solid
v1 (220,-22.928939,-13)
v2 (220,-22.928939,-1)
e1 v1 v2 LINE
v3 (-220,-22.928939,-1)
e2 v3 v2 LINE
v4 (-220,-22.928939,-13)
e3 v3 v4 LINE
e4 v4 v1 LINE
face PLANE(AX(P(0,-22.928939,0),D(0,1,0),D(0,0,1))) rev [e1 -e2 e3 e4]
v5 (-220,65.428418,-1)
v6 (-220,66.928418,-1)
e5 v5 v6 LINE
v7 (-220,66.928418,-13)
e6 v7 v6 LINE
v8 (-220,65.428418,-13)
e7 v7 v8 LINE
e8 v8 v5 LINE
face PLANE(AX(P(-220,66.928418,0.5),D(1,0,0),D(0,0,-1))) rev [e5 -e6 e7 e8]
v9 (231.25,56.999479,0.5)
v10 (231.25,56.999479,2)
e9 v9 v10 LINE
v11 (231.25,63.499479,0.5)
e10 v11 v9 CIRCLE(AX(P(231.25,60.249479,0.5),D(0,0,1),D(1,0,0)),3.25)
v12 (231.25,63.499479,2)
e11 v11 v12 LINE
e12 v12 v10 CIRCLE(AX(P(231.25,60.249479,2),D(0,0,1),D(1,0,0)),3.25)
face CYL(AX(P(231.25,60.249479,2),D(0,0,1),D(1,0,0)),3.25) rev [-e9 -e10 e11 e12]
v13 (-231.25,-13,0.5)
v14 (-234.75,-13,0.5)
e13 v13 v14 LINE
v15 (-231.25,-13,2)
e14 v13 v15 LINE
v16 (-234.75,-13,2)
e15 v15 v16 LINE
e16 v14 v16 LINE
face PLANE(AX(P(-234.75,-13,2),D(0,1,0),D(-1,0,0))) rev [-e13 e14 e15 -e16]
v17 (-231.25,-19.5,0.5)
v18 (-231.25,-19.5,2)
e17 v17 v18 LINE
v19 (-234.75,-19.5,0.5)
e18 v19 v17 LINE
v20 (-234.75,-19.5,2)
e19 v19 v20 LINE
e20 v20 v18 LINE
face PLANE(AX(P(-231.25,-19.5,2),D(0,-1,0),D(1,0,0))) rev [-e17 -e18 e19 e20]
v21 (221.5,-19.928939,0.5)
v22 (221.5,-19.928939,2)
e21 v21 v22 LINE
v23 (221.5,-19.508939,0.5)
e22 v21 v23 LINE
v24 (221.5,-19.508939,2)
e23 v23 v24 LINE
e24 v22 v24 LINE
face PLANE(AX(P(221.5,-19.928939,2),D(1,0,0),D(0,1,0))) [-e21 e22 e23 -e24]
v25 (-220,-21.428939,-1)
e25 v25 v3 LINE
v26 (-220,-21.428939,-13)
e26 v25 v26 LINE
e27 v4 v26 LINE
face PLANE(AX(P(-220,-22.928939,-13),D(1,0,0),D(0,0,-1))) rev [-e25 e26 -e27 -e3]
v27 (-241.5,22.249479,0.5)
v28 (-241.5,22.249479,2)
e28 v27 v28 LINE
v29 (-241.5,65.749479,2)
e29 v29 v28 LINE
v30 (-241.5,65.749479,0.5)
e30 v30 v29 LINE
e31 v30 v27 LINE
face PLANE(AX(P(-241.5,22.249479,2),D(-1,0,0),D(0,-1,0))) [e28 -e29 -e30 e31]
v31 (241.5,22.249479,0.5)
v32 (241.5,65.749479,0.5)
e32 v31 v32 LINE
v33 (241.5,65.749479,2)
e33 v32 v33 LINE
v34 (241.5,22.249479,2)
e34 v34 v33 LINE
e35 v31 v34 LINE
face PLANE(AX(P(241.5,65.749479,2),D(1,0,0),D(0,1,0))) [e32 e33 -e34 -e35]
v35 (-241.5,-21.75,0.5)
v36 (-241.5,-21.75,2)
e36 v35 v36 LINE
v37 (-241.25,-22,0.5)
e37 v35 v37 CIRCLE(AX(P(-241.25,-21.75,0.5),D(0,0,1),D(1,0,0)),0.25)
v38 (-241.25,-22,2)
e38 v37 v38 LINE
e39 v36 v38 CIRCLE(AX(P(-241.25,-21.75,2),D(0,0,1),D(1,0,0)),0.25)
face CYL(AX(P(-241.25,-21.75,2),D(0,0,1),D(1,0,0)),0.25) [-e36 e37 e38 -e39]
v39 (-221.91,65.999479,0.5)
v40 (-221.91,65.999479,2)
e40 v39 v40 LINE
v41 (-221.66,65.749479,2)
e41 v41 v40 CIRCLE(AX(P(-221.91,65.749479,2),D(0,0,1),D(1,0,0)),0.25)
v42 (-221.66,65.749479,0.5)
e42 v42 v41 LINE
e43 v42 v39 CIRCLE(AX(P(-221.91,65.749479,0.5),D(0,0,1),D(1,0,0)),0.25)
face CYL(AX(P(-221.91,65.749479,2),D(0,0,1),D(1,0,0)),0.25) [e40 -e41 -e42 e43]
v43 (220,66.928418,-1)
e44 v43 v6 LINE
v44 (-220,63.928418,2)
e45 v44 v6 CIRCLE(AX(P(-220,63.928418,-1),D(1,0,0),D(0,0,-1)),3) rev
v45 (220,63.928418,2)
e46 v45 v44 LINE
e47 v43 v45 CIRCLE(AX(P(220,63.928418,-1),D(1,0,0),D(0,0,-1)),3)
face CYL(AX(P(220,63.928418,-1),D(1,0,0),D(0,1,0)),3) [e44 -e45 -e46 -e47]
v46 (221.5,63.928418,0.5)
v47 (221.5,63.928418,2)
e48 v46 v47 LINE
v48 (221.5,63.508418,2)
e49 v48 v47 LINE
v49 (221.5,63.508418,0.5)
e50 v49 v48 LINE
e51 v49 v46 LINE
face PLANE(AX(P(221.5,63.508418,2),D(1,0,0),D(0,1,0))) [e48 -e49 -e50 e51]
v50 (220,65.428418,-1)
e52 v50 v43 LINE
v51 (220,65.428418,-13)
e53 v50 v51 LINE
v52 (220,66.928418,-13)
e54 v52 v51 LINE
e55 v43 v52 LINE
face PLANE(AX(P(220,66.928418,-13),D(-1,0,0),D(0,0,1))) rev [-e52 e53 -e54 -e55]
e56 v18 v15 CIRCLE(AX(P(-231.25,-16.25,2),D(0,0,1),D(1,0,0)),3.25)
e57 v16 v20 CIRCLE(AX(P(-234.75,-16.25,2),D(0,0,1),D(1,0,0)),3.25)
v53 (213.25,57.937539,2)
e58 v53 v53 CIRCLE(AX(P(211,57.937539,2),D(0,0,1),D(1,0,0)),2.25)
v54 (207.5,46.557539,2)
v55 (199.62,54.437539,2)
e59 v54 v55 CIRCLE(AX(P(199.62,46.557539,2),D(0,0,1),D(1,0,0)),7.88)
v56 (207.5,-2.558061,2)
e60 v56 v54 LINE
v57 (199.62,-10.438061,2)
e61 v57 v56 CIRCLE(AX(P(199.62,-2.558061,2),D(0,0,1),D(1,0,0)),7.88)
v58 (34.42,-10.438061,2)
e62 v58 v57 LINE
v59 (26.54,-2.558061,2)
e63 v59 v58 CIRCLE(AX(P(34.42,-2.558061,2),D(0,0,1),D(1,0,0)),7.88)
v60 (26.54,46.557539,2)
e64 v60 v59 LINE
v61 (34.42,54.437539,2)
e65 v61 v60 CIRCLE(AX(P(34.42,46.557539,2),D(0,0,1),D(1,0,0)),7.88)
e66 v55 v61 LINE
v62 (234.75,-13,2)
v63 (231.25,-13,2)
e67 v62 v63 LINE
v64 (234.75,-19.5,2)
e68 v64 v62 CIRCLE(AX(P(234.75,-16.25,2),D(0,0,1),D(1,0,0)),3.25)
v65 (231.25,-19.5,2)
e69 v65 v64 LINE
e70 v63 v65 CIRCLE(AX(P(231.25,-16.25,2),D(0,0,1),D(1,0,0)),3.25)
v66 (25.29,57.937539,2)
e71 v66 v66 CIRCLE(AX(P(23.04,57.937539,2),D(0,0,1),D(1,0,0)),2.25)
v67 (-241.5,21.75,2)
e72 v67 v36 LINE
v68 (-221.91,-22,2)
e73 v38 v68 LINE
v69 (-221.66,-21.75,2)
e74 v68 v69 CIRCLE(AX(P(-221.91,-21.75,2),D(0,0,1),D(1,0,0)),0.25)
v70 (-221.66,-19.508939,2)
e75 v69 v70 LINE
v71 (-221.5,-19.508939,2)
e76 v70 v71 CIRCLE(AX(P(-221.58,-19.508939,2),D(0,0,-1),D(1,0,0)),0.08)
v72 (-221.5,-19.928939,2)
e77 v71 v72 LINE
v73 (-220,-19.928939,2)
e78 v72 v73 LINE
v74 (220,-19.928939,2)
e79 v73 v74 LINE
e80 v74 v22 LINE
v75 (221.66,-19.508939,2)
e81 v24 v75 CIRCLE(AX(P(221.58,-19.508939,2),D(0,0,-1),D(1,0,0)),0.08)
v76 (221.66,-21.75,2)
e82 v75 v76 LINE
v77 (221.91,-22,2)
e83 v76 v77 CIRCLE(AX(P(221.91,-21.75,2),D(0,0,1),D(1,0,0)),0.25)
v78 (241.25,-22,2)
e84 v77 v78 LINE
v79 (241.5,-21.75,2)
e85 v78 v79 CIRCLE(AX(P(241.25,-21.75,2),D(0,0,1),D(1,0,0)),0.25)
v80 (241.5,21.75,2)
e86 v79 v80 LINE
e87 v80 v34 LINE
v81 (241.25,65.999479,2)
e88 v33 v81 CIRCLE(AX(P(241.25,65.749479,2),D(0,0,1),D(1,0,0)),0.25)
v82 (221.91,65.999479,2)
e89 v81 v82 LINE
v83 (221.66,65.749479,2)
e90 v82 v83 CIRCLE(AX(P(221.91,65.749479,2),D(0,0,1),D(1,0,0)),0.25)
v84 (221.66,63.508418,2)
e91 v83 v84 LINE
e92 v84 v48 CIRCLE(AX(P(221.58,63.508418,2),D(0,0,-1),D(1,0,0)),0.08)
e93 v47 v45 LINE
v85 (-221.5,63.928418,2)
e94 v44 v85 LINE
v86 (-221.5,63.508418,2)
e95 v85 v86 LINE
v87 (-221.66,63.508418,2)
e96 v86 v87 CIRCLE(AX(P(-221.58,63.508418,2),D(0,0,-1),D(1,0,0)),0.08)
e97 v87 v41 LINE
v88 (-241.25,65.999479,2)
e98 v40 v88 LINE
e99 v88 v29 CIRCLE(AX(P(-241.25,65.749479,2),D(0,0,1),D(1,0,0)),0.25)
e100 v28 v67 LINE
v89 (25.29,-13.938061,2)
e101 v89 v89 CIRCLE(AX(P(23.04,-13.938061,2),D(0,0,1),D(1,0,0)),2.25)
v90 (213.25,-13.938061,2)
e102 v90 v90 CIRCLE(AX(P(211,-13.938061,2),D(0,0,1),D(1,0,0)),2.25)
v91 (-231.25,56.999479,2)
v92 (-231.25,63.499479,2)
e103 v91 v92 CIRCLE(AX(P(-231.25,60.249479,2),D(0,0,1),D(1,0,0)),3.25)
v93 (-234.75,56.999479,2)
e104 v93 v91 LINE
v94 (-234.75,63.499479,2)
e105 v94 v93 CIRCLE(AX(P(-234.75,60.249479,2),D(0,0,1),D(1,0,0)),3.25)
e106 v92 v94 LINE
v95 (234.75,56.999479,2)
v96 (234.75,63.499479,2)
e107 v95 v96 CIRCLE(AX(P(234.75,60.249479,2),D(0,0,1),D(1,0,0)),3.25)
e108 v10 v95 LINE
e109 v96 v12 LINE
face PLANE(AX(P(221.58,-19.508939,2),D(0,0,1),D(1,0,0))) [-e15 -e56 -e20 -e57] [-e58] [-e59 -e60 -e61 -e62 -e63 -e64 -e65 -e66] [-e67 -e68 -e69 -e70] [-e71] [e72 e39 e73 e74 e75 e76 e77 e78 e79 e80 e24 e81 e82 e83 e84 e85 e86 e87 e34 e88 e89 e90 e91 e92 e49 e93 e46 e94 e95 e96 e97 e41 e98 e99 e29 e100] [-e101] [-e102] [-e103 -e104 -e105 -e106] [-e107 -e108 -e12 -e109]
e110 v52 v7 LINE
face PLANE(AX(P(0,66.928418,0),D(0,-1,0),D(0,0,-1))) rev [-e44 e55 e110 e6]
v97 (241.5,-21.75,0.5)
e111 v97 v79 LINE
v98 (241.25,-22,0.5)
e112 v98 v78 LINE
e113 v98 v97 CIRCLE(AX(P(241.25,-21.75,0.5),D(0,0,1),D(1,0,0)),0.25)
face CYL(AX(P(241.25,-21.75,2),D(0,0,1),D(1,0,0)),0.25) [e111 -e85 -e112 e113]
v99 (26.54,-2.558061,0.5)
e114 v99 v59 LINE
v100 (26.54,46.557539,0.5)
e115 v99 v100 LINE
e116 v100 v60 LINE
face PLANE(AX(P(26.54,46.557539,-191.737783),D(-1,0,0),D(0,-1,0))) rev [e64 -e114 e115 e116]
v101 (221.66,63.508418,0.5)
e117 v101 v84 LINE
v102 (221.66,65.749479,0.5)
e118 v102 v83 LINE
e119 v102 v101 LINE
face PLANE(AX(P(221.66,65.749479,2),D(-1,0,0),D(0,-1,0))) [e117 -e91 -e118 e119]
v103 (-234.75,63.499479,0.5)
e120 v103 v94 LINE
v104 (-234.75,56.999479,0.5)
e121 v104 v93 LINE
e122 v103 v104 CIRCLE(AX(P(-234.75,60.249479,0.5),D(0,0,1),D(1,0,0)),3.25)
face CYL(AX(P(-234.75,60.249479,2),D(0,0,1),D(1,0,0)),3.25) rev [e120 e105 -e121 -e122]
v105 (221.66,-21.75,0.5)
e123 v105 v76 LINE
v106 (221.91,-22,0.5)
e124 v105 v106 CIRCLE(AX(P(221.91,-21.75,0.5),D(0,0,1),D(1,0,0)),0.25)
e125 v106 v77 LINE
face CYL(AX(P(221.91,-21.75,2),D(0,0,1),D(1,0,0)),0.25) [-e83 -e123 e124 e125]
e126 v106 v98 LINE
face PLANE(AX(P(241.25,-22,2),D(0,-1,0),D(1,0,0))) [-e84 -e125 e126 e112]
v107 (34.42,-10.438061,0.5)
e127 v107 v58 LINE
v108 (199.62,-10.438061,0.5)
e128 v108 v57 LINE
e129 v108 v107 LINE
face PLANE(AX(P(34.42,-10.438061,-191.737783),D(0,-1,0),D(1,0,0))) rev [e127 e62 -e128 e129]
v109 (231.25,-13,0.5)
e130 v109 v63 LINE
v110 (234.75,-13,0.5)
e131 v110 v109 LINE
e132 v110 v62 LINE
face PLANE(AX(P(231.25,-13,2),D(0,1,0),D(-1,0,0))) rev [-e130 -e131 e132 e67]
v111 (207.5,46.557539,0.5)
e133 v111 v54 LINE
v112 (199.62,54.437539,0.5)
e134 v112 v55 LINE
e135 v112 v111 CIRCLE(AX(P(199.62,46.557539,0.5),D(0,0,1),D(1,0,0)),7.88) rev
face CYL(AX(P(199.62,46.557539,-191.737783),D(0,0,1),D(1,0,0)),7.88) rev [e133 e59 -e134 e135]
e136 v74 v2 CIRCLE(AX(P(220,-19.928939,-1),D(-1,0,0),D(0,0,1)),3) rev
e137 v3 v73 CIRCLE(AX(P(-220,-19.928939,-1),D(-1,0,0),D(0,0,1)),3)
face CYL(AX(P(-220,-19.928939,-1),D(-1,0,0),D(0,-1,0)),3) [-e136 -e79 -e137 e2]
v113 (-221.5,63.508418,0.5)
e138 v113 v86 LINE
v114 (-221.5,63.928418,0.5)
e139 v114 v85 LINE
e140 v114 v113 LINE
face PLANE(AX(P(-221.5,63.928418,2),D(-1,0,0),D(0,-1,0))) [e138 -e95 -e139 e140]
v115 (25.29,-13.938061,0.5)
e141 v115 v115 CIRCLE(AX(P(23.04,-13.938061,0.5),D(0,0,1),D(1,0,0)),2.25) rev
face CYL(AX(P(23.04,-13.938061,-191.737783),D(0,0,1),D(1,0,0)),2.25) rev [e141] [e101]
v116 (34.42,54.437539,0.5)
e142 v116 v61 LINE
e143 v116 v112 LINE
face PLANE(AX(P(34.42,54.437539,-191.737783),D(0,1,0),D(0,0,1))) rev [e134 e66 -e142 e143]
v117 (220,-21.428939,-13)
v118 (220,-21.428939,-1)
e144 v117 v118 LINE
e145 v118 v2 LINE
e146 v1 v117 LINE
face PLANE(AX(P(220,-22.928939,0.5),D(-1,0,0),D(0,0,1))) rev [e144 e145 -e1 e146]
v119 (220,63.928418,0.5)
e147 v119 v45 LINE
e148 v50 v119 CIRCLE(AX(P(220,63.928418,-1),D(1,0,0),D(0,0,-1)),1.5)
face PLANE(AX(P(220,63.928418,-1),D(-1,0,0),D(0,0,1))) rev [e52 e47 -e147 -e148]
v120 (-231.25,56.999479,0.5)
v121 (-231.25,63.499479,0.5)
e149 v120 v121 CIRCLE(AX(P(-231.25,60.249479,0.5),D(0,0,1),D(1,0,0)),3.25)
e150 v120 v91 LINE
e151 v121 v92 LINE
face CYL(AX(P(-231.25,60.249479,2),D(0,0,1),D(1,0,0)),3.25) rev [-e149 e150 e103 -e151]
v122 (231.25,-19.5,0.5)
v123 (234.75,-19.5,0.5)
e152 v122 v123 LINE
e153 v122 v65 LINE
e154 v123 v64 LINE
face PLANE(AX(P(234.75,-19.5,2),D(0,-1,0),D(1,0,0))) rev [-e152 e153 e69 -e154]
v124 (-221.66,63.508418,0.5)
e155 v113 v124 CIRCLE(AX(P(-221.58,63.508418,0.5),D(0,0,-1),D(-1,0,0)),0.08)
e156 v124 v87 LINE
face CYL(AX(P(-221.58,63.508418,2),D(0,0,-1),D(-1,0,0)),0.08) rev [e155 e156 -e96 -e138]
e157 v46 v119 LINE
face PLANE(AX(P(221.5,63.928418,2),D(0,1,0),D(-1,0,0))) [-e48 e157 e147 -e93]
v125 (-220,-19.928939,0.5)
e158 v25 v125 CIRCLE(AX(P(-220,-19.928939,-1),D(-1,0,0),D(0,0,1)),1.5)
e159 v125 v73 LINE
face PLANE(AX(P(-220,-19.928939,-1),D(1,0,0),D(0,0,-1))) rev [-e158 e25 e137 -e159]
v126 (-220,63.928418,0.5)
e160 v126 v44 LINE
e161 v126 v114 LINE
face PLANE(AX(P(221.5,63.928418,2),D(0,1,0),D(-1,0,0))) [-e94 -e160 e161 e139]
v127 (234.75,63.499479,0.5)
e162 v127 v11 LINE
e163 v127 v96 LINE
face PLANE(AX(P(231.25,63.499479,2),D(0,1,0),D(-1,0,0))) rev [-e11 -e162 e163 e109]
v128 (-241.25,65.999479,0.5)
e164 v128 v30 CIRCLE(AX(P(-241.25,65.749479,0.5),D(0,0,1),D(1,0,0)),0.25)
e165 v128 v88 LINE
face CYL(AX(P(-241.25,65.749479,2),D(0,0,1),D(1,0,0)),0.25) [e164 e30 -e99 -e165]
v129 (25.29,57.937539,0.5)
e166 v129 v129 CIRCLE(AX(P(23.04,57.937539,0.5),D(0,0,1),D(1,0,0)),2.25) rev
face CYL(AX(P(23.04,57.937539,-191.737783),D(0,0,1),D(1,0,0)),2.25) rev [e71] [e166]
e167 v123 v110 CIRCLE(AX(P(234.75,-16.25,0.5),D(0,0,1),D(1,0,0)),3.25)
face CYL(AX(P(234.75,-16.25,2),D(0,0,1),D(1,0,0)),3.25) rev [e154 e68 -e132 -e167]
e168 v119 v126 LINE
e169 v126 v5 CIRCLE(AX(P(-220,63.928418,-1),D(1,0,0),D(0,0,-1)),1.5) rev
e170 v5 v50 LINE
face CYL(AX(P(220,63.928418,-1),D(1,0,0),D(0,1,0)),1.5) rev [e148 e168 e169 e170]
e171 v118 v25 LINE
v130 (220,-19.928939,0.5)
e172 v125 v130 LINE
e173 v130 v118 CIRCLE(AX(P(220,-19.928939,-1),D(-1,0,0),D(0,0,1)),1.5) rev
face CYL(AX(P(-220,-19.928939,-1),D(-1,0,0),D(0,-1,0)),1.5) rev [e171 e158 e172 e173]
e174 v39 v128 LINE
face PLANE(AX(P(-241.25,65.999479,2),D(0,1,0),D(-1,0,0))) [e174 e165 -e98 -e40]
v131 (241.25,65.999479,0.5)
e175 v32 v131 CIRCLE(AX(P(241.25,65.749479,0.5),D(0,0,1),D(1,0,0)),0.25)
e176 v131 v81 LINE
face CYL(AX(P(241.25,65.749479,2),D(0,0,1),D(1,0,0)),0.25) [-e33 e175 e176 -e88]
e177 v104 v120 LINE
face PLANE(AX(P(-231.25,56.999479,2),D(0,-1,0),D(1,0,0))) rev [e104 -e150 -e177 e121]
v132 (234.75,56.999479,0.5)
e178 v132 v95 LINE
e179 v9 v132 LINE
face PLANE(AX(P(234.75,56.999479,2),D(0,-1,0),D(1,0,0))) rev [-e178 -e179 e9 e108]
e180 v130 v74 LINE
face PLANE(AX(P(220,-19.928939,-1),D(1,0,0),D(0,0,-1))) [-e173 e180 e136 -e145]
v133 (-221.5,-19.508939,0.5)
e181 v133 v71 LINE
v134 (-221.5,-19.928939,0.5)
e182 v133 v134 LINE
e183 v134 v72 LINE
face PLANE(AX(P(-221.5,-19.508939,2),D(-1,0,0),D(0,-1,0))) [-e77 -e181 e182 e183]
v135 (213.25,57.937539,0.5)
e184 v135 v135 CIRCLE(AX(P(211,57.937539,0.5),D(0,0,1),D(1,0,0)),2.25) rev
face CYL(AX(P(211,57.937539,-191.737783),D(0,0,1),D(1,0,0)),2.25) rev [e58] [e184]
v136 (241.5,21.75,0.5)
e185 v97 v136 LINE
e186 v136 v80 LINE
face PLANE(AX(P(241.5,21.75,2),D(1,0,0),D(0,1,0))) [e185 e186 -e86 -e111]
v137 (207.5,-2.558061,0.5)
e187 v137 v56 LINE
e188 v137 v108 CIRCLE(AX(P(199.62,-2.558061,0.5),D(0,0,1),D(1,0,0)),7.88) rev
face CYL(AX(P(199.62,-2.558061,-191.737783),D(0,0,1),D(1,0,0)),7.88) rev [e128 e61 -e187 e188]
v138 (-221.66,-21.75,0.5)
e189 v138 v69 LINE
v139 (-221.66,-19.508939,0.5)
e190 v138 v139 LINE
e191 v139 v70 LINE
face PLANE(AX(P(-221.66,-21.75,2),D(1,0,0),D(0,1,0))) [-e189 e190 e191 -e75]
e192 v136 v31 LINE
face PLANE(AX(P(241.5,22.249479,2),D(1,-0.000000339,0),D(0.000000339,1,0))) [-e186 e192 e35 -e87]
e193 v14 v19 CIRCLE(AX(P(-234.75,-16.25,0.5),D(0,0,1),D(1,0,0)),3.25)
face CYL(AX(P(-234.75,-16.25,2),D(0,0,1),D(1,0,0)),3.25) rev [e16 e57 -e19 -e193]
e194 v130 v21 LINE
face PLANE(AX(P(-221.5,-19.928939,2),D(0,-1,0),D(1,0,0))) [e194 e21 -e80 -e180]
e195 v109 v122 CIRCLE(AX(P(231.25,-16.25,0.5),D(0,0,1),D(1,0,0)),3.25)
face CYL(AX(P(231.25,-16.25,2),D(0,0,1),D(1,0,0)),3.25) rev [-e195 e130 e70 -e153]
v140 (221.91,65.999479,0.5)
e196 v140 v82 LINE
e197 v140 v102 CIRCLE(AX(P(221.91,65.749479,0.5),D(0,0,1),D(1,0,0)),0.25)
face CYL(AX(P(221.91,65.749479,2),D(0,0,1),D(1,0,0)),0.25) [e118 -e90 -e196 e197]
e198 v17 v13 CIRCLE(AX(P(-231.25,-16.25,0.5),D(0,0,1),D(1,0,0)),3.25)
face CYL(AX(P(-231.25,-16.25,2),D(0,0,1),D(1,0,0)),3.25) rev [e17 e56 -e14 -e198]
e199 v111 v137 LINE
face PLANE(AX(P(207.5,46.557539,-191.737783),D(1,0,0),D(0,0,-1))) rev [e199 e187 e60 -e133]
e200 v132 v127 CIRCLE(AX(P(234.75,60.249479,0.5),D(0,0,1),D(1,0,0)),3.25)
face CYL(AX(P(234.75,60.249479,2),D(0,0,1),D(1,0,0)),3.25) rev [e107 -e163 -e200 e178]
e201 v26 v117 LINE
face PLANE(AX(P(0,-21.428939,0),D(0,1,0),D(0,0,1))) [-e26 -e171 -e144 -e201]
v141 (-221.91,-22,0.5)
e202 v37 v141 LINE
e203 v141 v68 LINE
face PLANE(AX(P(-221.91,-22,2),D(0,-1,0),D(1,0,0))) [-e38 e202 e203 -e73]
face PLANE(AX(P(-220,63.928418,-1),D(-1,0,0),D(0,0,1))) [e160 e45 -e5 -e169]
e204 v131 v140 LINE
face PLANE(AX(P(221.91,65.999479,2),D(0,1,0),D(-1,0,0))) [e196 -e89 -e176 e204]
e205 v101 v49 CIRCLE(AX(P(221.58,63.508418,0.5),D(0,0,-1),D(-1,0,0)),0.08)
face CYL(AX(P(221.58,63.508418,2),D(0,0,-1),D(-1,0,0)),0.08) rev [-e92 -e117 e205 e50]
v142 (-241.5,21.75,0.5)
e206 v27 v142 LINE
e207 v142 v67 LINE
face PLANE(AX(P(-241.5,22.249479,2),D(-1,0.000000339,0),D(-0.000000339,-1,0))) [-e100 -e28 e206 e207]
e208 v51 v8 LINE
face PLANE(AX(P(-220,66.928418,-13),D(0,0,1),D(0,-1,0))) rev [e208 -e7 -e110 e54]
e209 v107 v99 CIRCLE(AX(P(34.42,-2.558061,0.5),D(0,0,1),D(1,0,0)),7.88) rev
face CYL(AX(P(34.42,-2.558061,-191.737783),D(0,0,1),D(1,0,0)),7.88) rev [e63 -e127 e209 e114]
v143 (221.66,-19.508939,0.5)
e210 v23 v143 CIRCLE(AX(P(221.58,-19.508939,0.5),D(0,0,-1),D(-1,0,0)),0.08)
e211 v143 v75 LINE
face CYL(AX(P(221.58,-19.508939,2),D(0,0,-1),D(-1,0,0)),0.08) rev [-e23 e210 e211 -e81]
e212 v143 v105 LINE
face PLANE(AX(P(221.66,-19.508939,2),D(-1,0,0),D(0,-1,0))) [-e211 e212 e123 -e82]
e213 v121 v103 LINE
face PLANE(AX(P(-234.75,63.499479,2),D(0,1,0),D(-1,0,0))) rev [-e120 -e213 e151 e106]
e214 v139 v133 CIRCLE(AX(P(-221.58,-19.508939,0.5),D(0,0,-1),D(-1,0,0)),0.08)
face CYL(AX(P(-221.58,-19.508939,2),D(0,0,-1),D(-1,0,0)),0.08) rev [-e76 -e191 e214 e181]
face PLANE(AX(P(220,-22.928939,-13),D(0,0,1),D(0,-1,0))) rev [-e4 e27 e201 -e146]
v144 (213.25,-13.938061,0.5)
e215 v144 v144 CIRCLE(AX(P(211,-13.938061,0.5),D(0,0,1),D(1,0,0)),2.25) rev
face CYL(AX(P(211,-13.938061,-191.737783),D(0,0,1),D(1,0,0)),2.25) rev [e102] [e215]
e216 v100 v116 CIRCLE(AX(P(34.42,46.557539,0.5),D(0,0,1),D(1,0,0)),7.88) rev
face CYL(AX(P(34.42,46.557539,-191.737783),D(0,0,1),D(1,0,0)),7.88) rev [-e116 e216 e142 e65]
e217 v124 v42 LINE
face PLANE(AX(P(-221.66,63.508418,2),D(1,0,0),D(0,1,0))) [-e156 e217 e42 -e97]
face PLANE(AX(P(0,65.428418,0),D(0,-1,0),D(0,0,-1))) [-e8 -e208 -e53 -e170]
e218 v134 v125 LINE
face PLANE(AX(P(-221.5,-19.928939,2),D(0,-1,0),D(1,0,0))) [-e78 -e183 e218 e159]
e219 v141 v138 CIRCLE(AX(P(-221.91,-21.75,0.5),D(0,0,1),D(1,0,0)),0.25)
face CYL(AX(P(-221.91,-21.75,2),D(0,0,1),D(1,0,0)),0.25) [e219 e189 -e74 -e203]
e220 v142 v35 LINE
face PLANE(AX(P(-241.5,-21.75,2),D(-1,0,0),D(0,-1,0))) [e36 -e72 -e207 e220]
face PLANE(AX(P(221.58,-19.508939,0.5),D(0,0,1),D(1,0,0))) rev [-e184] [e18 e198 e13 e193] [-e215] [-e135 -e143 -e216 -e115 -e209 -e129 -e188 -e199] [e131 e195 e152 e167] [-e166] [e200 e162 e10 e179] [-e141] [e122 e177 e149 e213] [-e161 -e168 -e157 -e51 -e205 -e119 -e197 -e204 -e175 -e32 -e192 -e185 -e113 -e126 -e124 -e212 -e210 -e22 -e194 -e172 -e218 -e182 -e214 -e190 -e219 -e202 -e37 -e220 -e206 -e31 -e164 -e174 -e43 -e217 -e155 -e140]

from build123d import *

# Parameters (mm, degrees)
BOSS_EXTRUDE1_DEPTH     = 2
CONVERT_SOLID1_DEPTH    = 0.5
EDGE_FLANGE1_DEPTH      = 440
EDGE_FLANGE1_BEND_DEPTH = 440
SKETCH12_R              = 2.25
CUT_EXTRUDE1_DEPTH      = 1.5


# Read off the part's stored shape, not the designer's step: Convert-Solid1
# Sheet-metal steps are written as plain solids
with BuildPart() as part:
    # Model → Boss-Extrude1 (new body)
    with BuildSketch(Plane.XY):
        with BuildLine():
            Line((221.66, -19.508939372), (221.66, -21.75))
            ThreePointArc((221.66, -21.75), (221.733223305, -21.926776695), (221.91, -22))
            Line((221.91, -22), (241.25, -22))
            ThreePointArc((241.25, -22), (241.426776695, -21.926776695), (241.5, -21.75))
            Line((241.5, -21.75), (241.5, 21.75))
            Line((241.5, 21.75), (241.500000169, 22.249478564))
            Line((241.500000169, 22.249478564), (241.500000169, 65.749478564))
            ThreePointArc((241.500000169, 65.749478564), (241.426776865, 65.926255259), (241.250000169, 65.999478564))
            Line((241.250000169, 65.999478564), (221.910000169, 65.999478564))
            ThreePointArc((221.910000169, 65.999478564), (221.733223474, 65.926255259), (221.660000169, 65.749478564))
            Line((221.660000169, 65.749478564), (221.660000169, 63.508417937))
            ThreePointArc((221.660000169, 63.508417937), (221.580000169, 63.428417937), (221.500000169, 63.508417937))
            Line((221.500000169, 63.508417937), (221.500000169, 63.928417937))
            Line((221.500000169, 63.928417937), (-221.499999831, 63.928417937))
            Line((-221.499999831, 63.928417937), (-221.499999831, 63.508417937))
            ThreePointArc((-221.499999831, 63.508417937), (-221.579999831, 63.428417937), (-221.659999831, 63.508417937))
            Line((-221.659999831, 63.508417937), (-221.659999831, 65.749478564))
            ThreePointArc((-221.659999831, 65.749478564), (-221.733223135, 65.926255259), (-221.909999831, 65.999478564))
            Line((-221.909999831, 65.999478564), (-241.249999831, 65.999478564))
            ThreePointArc((-241.249999831, 65.999478564), (-241.426776526, 65.926255259), (-241.499999831, 65.749478564))
            Line((-241.499999831, 65.749478564), (-241.499999831, 22.249478564))
            Line((-241.499999831, 22.249478564), (-241.5, 21.75))
            Line((-241.5, 21.75), (-241.5, -21.75))
            ThreePointArc((-241.5, -21.75), (-241.426776695, -21.926776695), (-241.25, -22))
            Line((-241.25, -22), (-221.91, -22))
            ThreePointArc((-221.91, -22), (-221.733223305, -21.926776695), (-221.66, -21.75))
            Line((-221.66, -21.75), (-221.66, -19.508939372))
            ThreePointArc((-221.66, -19.508939372), (-221.58, -19.428939372), (-221.5, -19.508939372))
            Line((-221.5, -19.508939372), (-221.5, -19.928939372))
            Line((-221.5, -19.928939372), (221.5, -19.928939372))
            Line((221.5, -19.928939372), (221.5, -19.508939372))
            ThreePointArc((221.5, -19.508939372), (221.58, -19.428939372), (221.66, -19.508939372))
        make_face()
        with BuildLine():
            Line((-231.25, -19.5), (-234.75, -19.5))
            ThreePointArc((-234.75, -19.5), (-238, -16.25), (-234.75, -13))
            Line((-234.75, -13), (-231.25, -13))
            ThreePointArc((-231.25, -13), (-228, -16.25), (-231.25, -19.5))
        make_face(mode=Mode.SUBTRACT)
        with BuildLine():
            Line((231.25, -13), (234.75, -13))
            ThreePointArc((234.75, -13), (238, -16.25), (234.75, -19.5))
            Line((234.75, -19.5), (231.25, -19.5))
            ThreePointArc((231.25, -19.5), (228, -16.25), (231.25, -13))
        make_face(mode=Mode.SUBTRACT)
        with BuildLine():
            Line((-231.249999831, 56.999478564), (-234.749999831, 56.999478564))
            ThreePointArc((-234.749999831, 56.999478564), (-237.999999831, 60.249478564), (-234.749999831, 63.499478564))
            Line((-234.749999831, 63.499478564), (-231.249999831, 63.499478564))
            ThreePointArc((-231.249999831, 63.499478564), (-227.999999831, 60.249478564), (-231.249999831, 56.999478564))
        make_face(mode=Mode.SUBTRACT)
        with BuildLine():
            Line((234.750000169, 56.999478564), (231.250000169, 56.999478564))
            ThreePointArc((231.250000169, 56.999478564), (228.000000169, 60.249478564), (231.250000169, 63.499478564))
            Line((231.250000169, 63.499478564), (234.750000169, 63.499478564))
            ThreePointArc((234.750000169, 63.499478564), (238.000000169, 60.249478564), (234.750000169, 56.999478564))
        make_face(mode=Mode.SUBTRACT)
    extrude(amount=BOSS_EXTRUDE1_DEPTH)

    # Convert-Solid1 outline → Convert-Solid1 (cut)
    with BuildSketch(Plane.XY):
        with BuildLine():
            Line((221.5, -19.928939372), (221.5, -19.508939372))
            ThreePointArc((221.5, -19.508939372), (221.58, -19.428939372), (221.66, -19.508939372))
            Line((221.66, -19.508939372), (221.66, -21.75))
            ThreePointArc((221.66, -21.75), (221.733223305, -21.926776695), (221.91, -22))
            Line((221.91, -22), (241.25, -22))
            ThreePointArc((241.25, -22), (241.426776695, -21.926776695), (241.5, -21.75))
            Line((241.5, -21.75), (241.5, 21.75))
            Line((241.5, 21.75), (241.500000169, 65.749478564))
            ThreePointArc((241.500000169, 65.749478564), (241.426776864, 65.926255259), (241.250000169, 65.999478564))
            Line((241.250000169, 65.999478564), (221.910000169, 65.999478564))
            ThreePointArc((221.910000169, 65.999478564), (221.733223474, 65.926255259), (221.660000169, 65.749478564))
            Line((221.660000169, 65.749478564), (221.660000169, 63.508417937))
            ThreePointArc((221.660000169, 63.508417937), (221.580000169, 63.428417937), (221.500000169, 63.508417937))
            Line((221.500000169, 63.508417937), (221.500000169, 63.928417937))
            Line((221.500000169, 63.928417937), (-221.499999831, 63.928417937))
            Line((-221.499999831, 63.928417937), (-221.499999831, 63.508417937))
            ThreePointArc((-221.499999831, 63.508417937), (-221.579999831, 63.428417937), (-221.659999831, 63.508417937))
            Line((-221.659999831, 63.508417937), (-221.659999831, 65.749478564))
            ThreePointArc((-221.659999831, 65.749478564), (-221.733223135, 65.926255259), (-221.909999831, 65.999478564))
            Line((-221.909999831, 65.999478564), (-241.249999831, 65.999478564))
            ThreePointArc((-241.249999831, 65.999478564), (-241.426776526, 65.926255259), (-241.499999831, 65.749478564))
            Line((-241.499999831, 65.749478564), (-241.499999831, 22.249478564))
            Line((-241.499999831, 22.249478564), (-241.5, -21.75))
            ThreePointArc((-241.5, -21.75), (-241.426776695, -21.926776695), (-241.25, -22))
            Line((-241.25, -22), (-221.91, -22))
            ThreePointArc((-221.91, -22), (-221.733223305, -21.926776695), (-221.66, -21.75))
            Line((-221.66, -21.75), (-221.66, -19.508939372))
            ThreePointArc((-221.66, -19.508939372), (-221.58, -19.428939372), (-221.5, -19.508939372))
            Line((-221.5, -19.508939372), (-221.5, -19.928939372))
            Line((-221.5, -19.928939372), (221.5, -19.928939372))
        make_face()
        with BuildLine():
            Line((-234.75, -13), (-231.25, -13))
            ThreePointArc((-231.25, -13), (-228, -16.25), (-231.25, -19.5))
            Line((-231.25, -19.5), (-234.75, -19.5))
            ThreePointArc((-234.75, -19.5), (-238, -16.25), (-234.75, -13))
        make_face(mode=Mode.SUBTRACT)
        with BuildLine():
            ThreePointArc((231.25, -19.5), (228, -16.25), (231.25, -13))
            Line((231.25, -13), (234.75, -13))
            ThreePointArc((234.75, -13), (238, -16.25), (234.75, -19.5))
            Line((234.75, -19.5), (231.25, -19.5))
        make_face(mode=Mode.SUBTRACT)
        with BuildLine():
            Line((-234.749999831, 63.499478564), (-231.249999831, 63.499478564))
            ThreePointArc((-231.249999831, 63.499478564), (-227.999999831, 60.249478564), (-231.249999831, 56.999478564))
            Line((-231.249999831, 56.999478564), (-234.749999831, 56.999478564))
            ThreePointArc((-234.749999831, 56.999478564), (-237.999999831, 60.249478564), (-234.749999831, 63.499478564))
        make_face(mode=Mode.SUBTRACT)
        with BuildLine():
            ThreePointArc((231.250000169, 56.999478564), (228.000000169, 60.249478564), (231.250000169, 63.499478564))
            Line((231.250000169, 63.499478564), (234.750000169, 63.499478564))
            ThreePointArc((234.750000169, 63.499478564), (238.000000169, 60.249478564), (234.750000169, 56.999478564))
            Line((234.750000169, 56.999478564), (231.250000169, 56.999478564))
        make_face(mode=Mode.SUBTRACT)
    extrude(amount=CONVERT_SOLID1_DEPTH, mode=Mode.SUBTRACT)

    # Edge-Flange1 section (across the edge) → Edge-Flange1 (add)
    with BuildSketch(Plane(origin=(-219.999999831, 65.428417937, 0.5), x_dir=(0, -1, 0), z_dir=(1, 0, 0))):
        with BuildLine():
            Line((-1.5, 1.5), (-1.5, 13.5))
            Line((-1.5, 13.5), (0, 13.5))
            Line((0, 13.5), (0, 1.5))
            ThreePointArc((0, 1.5), (0.439339828, 0.439339828), (1.5, 0))
            Line((1.5, 0), (1.5, -1.5))
            ThreePointArc((1.5, -1.5), (-0.621320344, -0.621320344), (-1.5, 1.5))
        make_face()
    extrude(amount=EDGE_FLANGE1_DEPTH)

    # Edge-Flange1 section 2 (across the edge) → Edge-Flange1 bend (add)
    with BuildSketch(Plane(origin=(220, -21.428939372, 0.5), x_dir=(0, 1, 0), z_dir=(-1, 0, 0))):
        with BuildLine():
            Line((-1.5, 1.5), (-1.5, 13.5))
            Line((-1.5, 13.5), (0, 13.5))
            Line((0, 13.5), (0, 1.5))
            ThreePointArc((0, 1.5), (0.439339828, 0.439339828), (1.5, 0))
            Line((1.5, 0), (1.5, -1.5))
            ThreePointArc((1.5, -1.5), (-0.621320344, -0.621320344), (-1.5, 1.5))
        make_face()
    extrude(amount=EDGE_FLANGE1_BEND_DEPTH)

    # Sketch12 → Cut-Extrude1 (cut)
    with BuildSketch(Plane.XY.offset(2)):
        with Locations((211.000000169, 57.937539282)):
            Circle(SKETCH12_R)
        with Locations((23.040000169, 57.937539282)):
            Circle(SKETCH12_R)
        with Locations((23.040000169, -13.938060718)):
            Circle(SKETCH12_R)
        with Locations((211.000000169, -13.938060718)):
            Circle(SKETCH12_R)
        with BuildLine():
            Line((34.420000169, 54.437539282), (199.620000169, 54.437539282))
            ThreePointArc((199.620000169, 54.437539282), (205.192001605, 52.129540718), (207.500000169, 46.557539282))
            Line((207.500000169, 46.557539282), (207.500000169, -2.558060718))
            ThreePointArc((207.500000169, -2.558060718), (205.192001605, -8.130062154), (199.620000169, -10.438060718))
            Line((199.620000169, -10.438060718), (34.420000169, -10.438060718))
            ThreePointArc((34.420000169, -10.438060718), (28.847998734, -8.130062154), (26.540000169, -2.558060718))
            Line((26.540000169, -2.558060718), (26.540000169, 46.557539282))
            ThreePointArc((26.540000169, 46.557539282), (28.847998734, 52.129540718), (34.420000169, 54.437539282))
        make_face()
    extrude(amount=-CUT_EXTRUDE1_DEPTH, mode=Mode.SUBTRACT)


solid = part.part
